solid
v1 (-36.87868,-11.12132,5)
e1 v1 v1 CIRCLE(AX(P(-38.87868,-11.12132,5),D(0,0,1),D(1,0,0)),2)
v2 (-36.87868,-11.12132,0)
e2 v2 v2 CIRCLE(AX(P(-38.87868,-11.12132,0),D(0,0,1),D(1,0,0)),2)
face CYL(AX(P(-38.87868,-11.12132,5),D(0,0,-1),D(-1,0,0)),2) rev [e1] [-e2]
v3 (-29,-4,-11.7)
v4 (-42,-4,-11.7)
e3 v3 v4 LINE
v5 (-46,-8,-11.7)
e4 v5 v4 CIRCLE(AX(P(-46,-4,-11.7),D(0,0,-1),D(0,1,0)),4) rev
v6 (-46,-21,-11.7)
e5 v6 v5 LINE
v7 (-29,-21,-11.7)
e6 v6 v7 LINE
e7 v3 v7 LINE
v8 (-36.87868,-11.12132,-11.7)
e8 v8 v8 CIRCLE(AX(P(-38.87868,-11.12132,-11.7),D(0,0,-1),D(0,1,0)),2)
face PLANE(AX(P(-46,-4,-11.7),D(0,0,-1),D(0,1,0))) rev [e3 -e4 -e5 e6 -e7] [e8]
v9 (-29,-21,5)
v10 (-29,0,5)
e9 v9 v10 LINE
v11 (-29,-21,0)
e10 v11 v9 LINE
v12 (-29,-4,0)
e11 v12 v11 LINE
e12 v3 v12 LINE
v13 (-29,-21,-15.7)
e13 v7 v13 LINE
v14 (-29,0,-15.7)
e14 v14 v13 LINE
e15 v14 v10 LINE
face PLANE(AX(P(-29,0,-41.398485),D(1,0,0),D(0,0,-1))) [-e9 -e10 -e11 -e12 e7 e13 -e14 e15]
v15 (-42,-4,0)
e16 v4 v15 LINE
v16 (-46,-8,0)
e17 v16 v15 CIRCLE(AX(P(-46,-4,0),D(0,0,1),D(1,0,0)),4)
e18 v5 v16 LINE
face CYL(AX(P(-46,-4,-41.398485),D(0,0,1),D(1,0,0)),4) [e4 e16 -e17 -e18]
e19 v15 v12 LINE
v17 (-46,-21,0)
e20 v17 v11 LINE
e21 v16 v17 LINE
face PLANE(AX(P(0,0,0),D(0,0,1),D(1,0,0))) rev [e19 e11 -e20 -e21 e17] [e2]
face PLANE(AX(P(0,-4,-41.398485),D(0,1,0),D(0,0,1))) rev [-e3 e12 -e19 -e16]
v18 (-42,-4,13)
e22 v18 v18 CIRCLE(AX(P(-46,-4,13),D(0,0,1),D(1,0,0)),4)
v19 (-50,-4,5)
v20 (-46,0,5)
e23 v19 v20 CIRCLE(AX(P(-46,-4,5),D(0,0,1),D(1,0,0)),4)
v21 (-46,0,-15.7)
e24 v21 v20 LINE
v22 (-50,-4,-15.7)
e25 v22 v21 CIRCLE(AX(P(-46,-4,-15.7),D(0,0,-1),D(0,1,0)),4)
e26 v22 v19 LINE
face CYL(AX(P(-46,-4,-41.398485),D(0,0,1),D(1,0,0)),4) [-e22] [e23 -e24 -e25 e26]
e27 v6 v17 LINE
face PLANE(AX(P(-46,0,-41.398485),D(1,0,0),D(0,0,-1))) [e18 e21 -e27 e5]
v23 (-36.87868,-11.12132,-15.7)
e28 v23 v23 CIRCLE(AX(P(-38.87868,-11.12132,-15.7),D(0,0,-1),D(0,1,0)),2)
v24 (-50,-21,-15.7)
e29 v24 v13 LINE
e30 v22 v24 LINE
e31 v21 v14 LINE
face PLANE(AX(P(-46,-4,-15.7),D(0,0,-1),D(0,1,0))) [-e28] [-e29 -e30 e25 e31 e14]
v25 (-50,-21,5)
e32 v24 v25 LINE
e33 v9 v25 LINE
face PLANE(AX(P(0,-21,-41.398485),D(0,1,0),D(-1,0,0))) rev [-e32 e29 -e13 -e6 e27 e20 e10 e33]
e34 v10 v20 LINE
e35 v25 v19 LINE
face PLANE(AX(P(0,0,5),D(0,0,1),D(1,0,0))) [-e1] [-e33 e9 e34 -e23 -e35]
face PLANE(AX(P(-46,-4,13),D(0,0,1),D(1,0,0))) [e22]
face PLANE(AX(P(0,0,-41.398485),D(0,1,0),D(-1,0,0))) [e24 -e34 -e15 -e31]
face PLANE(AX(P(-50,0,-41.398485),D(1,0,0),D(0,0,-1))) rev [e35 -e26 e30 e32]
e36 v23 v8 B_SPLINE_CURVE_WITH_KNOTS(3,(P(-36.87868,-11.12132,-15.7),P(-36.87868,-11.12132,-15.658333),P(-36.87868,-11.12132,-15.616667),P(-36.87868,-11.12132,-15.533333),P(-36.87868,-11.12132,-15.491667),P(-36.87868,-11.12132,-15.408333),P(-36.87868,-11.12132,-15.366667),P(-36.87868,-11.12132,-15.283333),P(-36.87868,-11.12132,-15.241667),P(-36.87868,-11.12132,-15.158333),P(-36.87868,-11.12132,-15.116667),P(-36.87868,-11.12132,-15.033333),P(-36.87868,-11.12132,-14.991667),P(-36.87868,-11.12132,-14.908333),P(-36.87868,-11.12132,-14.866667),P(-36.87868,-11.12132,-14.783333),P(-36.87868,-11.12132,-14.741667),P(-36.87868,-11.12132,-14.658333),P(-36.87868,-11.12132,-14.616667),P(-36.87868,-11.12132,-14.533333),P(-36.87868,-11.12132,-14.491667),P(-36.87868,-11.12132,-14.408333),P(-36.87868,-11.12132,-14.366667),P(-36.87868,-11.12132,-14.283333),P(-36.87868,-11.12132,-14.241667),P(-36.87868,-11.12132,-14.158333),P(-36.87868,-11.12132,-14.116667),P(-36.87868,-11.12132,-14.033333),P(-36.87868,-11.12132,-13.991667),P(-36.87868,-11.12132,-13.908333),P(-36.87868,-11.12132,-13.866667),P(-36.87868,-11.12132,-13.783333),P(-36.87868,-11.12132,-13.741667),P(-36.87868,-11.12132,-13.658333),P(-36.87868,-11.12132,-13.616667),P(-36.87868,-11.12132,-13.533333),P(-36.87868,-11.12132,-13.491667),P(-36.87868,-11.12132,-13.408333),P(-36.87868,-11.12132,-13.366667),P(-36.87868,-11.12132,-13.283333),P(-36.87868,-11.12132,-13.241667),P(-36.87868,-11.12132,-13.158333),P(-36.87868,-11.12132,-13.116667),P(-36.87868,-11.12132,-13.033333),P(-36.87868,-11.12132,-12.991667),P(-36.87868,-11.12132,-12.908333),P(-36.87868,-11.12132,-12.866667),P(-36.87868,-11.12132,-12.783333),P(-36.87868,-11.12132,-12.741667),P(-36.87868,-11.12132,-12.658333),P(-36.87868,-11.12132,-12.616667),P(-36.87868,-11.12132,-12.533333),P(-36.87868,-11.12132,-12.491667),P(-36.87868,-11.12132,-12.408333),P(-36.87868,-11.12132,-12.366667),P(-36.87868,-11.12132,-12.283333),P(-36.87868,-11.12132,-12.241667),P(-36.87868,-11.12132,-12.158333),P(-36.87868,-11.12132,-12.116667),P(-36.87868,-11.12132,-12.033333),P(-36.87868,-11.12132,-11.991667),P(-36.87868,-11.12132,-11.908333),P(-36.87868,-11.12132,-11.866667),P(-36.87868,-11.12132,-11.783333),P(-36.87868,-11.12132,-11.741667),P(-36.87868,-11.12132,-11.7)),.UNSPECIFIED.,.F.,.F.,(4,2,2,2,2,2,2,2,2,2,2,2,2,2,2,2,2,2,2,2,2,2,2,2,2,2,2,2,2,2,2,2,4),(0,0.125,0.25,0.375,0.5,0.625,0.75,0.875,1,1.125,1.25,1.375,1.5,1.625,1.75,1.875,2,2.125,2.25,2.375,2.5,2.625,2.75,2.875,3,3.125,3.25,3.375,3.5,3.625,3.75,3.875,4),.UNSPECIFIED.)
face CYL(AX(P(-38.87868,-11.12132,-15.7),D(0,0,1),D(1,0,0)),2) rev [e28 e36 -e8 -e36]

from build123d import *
from build123d.topology import SkipClean

# Parameters (mm, degrees)
BOSS_EXTRUDE1_DEPTH     = 11.7
BOSS_EXTRUDE4_START     = 8
SKETCH1_6_R             = 4
BOSS_EXTRUDE4_DEPTH     = 8
BOSS_EXTRUDE5_START     = -11.7
SKETCH1_7_R             = 2
BOSS_EXTRUDE5_DEPTH     = 4
BOSS_EXTRUDE6_START     = 5
SKETCH1_8_R             = 2
BOSS_EXTRUDE6_DEPTH     = 5
BOSS_EXTRUDE7_START     = 8
BOSS_EXTRUDE7_OUTLINE_R = 4
BOSS_EXTRUDE7_DEPTH     = 5
SKETCH2_W               = 7
SKETCH2_H               = 10
SKETCH2_H_2             = 7
SKETCH2_W_2             = 10
BOSS_EXTRUDE8_DEPTH     = 5
BOSS_EXTRUDE9_START     = -20.7
SKETCH2_3_W             = 7
SKETCH2_3_H             = 10
SKETCH2_3_W_2           = 10
SKETCH2_3_H_2           = 7
BOSS_EXTRUDE9_DEPTH     = 4


# Read off the part's stored shape, not the designer's step: Boss-Extrude7
with BuildPart() as part:
    # Sketch1 → Boss-Extrude1 (new body)
    with BuildSketch(Plane.XY):
        with BuildLine():
            Line((-36, -4), (-29, -4))
            Line((-29, -4), (-29, 0))
            Line((-29, 0), (-46, 0))
            ThreePointArc((-46, 0), (-43.171572875, -1.171572875), (-42, -4))
            Line((-42, -4), (-36, -4))
        make_face()
        with BuildLine():
            ThreePointArc((-46, -8), (-43.171572875, -6.828427125), (-42, -4))
            Line((-42, -4), (-46, -4))
            Line((-46, -4), (-46, -8))
        make_face()
        with BuildLine():
            Line((-46, -4), (-42, -4))
            ThreePointArc((-42, -4), (-43.171572875, -1.171572875), (-46, 0))
            Line((-46, 0), (-46, -4))
        make_face()
        with BuildLine():
            Line((-46, -4), (-46, 0))
            ThreePointArc((-46, 0), (-48.828427125, -1.171572875), (-50, -4))
            Line((-50, -4), (-46, -4))
        make_face()
        with BuildLine():
            Line((-46, -8), (-46, -4))
            Line((-46, -4), (-50, -4))
            ThreePointArc((-50, -4), (-48.828427125, -6.828427125), (-46, -8))
        make_face()
        with BuildLine():
            Line((-46, -14), (-46, -8))
            ThreePointArc((-46, -8), (-48.828427125, -6.828427125), (-50, -4))
            Line((-50, -4), (-50, -21))
            Line((-50, -21), (-46, -21))
            Line((-46, -21), (-46, -14))
        make_face()
    extrude(amount=-BOSS_EXTRUDE1_DEPTH)

    # Sketch1<6> → Boss-Extrude4 (add)
    with BuildSketch(Plane.XY.offset(BOSS_EXTRUDE4_START)):
        with Locations((-46, -4)):
            Circle(SKETCH1_6_R)
    extrude(amount=-BOSS_EXTRUDE4_DEPTH)

    # Sketch1<7> → Boss-Extrude5 (add)
    with SkipClean():  # the faces are left unmerged after this step: merging them gives an invalid solid
        with BuildSketch(Plane.XY.offset(BOSS_EXTRUDE5_START)):
            with BuildLine():
                Line((-36, -4), (-29, -4))
                Line((-29, -4), (-29, 0))
                Line((-29, 0), (-46, 0))
                ThreePointArc((-46, 0), (-48.828427125, -1.171572875), (-50, -4))
                Line((-50, -4), (-50, -21))
                Line((-50, -21), (-46, -21))
                Line((-46, -21), (-46, -14))
                Line((-46, -14), (-36, -14))
                Line((-36, -14), (-36, -4))
            make_face()
            with Locations((-38.878679656, -11.121320344)):
                Circle(SKETCH1_7_R, mode=Mode.SUBTRACT)
        extrude(amount=-BOSS_EXTRUDE5_DEPTH)

    # Sketch1<8> → Boss-Extrude6 (add)
    # profile 1 of 3: a face of its own
    with BuildSketch(Plane.XY.offset(BOSS_EXTRUDE6_START)):
        with BuildLine():
            Line((-46, -14), (-46, -8))
            ThreePointArc((-46, -8), (-48.828427125, -6.828427125), (-50, -4))
            Line((-50, -4), (-50, -21))
            Line((-50, -21), (-46, -21))
            Line((-46, -21), (-46, -14))
        make_face()
    # profile 2 of 3: a face of its own
    with BuildSketch(Plane.XY.offset(BOSS_EXTRUDE6_START)):
        with BuildLine():
            Line((-36, -14), (-36, -4))
            Line((-36, -4), (-42, -4))
            ThreePointArc((-42, -4), (-43.171572875, -6.828427125), (-46, -8))
            Line((-46, -8), (-46, -14))
            Line((-46, -14), (-36, -14))
        make_face()
        with Locations((-38.878679656, -11.121320344)):
            Circle(SKETCH1_8_R, mode=Mode.SUBTRACT)
    # profile 3 of 3: a face of its own
    with BuildSketch(Plane.XY.offset(BOSS_EXTRUDE6_START)):
        with BuildLine():
            Line((-36, -4), (-29, -4))
            Line((-29, -4), (-29, 0))
            Line((-29, 0), (-46, 0))
            ThreePointArc((-46, 0), (-43.171572875, -1.171572875), (-42, -4))
            Line((-42, -4), (-36, -4))
        make_face()
    extrude(amount=-BOSS_EXTRUDE6_DEPTH)

    # Boss-Extrude7 outline → Boss-Extrude7 (add)
    with BuildSketch(Plane.XY.offset(BOSS_EXTRUDE7_START)):
        with Locations((-46, -4)):
            Circle(BOSS_EXTRUDE7_OUTLINE_R)
    extrude(amount=BOSS_EXTRUDE7_DEPTH)

    # Sketch2 → Boss-Extrude8 (add)
    with BuildSketch(Plane.XY.offset(5)):
        with Locations((-32.5, -9)):
            Rectangle(SKETCH2_W, SKETCH2_H)
        with Locations((-32.5, -17.5)):
            Rectangle(SKETCH2_W, SKETCH2_H_2)
        with Locations((-41, -17.5)):
            Rectangle(SKETCH2_W_2, SKETCH2_H_2)
    extrude(amount=-BOSS_EXTRUDE8_DEPTH)

    # Sketch2<3> → Boss-Extrude9 (add)
    with BuildSketch(Plane.XY.offset(5).offset(BOSS_EXTRUDE9_START)):
        with Locations((-32.5, -9)):
            Rectangle(SKETCH2_3_W, SKETCH2_3_H)
        with Locations((-41, -17.5)):
            Rectangle(SKETCH2_3_W_2, SKETCH2_3_H_2)
        with Locations((-32.5, -17.5)):
            Rectangle(SKETCH2_3_W, SKETCH2_3_H_2)
    extrude(amount=BOSS_EXTRUDE9_DEPTH)


solid = part.part
